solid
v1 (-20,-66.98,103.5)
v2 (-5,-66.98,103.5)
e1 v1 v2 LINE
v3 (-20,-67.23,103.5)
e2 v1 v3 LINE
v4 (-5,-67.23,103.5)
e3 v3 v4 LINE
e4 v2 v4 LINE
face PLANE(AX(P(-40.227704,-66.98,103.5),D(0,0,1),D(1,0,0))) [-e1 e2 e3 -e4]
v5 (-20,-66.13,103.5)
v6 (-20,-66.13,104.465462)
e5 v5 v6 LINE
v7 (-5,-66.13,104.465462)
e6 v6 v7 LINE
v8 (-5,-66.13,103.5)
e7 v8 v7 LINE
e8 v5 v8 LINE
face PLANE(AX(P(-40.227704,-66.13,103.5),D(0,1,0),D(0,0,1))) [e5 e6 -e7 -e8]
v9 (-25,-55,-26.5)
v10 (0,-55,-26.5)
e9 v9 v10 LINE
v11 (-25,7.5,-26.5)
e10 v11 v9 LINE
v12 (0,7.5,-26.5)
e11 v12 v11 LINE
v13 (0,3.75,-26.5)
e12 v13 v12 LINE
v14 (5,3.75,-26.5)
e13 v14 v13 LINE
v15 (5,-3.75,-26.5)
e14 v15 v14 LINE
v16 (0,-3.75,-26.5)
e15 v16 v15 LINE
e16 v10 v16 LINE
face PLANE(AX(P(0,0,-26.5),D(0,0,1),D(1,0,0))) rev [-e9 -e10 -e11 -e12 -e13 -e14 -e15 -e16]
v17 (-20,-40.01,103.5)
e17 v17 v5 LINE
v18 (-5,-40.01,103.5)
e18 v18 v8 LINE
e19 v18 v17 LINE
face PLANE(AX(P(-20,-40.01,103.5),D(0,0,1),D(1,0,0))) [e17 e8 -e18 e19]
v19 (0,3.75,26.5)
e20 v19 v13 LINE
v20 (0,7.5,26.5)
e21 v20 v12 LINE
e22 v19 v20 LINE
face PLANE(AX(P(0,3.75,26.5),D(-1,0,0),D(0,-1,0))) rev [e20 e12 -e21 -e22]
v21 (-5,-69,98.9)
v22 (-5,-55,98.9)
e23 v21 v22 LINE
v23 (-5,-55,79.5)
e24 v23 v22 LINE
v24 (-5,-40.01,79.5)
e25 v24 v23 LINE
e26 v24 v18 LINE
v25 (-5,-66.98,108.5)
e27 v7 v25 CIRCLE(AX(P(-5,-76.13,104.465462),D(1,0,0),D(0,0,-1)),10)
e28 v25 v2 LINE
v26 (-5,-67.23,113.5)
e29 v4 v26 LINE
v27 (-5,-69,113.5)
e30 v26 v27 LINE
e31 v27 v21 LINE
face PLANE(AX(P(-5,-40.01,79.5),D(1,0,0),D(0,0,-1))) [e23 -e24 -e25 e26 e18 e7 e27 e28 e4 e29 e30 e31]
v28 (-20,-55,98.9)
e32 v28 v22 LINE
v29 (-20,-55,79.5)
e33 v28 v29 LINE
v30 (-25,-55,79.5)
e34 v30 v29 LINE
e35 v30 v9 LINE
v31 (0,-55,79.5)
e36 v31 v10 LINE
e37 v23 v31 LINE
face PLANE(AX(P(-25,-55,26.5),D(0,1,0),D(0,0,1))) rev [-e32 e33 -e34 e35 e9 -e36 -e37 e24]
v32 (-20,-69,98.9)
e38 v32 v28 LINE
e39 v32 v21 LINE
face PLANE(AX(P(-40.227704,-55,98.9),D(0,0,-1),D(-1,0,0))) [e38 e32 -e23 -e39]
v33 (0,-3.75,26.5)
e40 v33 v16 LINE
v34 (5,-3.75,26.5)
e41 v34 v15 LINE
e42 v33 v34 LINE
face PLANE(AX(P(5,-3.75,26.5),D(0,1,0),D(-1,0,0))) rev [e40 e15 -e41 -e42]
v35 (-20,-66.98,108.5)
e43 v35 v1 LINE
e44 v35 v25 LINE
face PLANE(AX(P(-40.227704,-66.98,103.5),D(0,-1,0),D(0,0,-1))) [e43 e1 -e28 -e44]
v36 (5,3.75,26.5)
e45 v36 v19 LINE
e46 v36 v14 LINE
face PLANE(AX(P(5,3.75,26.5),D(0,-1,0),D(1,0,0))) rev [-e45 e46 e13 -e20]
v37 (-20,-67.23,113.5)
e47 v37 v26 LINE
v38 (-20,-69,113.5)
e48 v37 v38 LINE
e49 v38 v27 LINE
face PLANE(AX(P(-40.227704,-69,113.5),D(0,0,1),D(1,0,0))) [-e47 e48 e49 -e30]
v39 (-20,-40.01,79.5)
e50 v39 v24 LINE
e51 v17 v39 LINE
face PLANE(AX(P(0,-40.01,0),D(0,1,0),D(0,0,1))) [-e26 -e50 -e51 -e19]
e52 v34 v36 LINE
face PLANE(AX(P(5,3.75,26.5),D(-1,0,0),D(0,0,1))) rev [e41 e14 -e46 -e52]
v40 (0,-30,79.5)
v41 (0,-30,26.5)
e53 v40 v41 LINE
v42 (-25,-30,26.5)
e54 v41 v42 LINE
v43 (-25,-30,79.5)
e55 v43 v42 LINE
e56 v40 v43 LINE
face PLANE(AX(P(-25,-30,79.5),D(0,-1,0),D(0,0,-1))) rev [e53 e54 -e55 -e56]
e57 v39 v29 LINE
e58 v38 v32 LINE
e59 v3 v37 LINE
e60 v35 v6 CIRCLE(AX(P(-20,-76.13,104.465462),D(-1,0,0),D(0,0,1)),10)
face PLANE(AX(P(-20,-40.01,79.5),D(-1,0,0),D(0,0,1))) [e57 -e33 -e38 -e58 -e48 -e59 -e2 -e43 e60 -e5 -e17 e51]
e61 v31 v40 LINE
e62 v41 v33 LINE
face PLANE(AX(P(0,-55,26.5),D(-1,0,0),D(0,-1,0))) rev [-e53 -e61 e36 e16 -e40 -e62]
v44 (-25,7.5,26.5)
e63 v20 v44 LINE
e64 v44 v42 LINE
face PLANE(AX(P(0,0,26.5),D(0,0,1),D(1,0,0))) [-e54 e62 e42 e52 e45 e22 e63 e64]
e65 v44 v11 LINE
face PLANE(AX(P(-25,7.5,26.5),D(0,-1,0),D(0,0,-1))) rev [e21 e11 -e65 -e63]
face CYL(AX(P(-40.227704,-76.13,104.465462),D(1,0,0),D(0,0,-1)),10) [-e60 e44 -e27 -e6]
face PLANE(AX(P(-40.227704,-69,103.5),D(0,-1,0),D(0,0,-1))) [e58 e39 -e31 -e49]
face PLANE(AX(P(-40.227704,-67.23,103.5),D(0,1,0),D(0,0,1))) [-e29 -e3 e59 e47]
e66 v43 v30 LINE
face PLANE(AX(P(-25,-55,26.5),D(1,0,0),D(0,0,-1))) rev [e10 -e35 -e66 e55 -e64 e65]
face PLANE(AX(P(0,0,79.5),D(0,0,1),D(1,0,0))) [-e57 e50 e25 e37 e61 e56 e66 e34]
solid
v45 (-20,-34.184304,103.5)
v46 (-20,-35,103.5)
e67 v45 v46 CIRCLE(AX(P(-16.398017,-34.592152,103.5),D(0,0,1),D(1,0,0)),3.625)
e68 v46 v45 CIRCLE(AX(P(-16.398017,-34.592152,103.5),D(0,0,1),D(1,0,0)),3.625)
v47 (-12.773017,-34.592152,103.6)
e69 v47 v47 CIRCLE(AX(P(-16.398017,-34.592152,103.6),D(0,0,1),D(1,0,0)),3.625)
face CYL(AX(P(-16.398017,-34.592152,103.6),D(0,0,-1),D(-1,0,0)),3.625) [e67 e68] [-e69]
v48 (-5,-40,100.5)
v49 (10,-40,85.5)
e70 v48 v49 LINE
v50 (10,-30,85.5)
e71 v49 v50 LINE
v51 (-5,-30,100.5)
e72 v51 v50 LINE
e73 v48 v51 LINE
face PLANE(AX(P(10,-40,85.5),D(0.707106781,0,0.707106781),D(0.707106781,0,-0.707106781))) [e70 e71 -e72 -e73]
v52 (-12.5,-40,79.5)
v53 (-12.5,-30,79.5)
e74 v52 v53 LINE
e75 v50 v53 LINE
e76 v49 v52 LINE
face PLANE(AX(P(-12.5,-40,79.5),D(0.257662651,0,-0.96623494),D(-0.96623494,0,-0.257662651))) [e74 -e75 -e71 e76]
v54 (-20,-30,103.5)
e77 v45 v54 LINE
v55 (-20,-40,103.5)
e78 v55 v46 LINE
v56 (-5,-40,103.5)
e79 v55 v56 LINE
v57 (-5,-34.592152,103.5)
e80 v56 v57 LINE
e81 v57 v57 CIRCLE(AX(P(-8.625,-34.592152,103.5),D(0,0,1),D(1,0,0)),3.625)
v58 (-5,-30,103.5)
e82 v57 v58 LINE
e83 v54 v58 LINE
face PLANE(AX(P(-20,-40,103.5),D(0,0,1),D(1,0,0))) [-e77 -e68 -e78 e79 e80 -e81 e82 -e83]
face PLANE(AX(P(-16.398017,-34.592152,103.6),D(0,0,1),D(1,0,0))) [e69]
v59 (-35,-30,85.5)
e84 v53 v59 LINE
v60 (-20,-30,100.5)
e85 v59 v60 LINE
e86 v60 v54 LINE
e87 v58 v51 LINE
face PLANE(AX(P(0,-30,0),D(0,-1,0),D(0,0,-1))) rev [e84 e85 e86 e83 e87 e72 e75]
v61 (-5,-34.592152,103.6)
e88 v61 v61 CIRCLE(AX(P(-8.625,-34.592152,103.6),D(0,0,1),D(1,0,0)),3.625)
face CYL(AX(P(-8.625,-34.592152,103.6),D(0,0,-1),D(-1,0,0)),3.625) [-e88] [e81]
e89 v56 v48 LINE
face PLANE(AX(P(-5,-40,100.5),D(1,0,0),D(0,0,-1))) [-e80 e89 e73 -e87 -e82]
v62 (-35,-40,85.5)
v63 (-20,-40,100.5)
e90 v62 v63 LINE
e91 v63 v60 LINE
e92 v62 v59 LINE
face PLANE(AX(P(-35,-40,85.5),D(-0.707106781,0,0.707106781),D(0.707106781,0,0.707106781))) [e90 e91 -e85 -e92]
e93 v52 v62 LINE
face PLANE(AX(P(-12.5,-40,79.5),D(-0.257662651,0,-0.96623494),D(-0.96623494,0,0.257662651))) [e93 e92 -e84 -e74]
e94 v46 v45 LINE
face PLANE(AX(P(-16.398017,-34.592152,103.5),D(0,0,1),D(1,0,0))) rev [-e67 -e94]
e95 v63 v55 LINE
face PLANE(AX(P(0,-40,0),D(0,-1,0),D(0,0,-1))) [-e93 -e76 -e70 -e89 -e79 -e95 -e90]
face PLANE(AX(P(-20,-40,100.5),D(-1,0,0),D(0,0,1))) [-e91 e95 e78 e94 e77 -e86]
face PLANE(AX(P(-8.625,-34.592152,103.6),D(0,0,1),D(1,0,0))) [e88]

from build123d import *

# Parameters (mm, degrees)
BOSS_EXTRUDE1_DEPTH  = 26.5
SKETCH3_W            = 25
SKETCH3_H            = 25
BOSS_EXTRUDE2_DEPTH  = 53
BOSS_EXTRUDE3_DEPTH  = 10
SKETCH6_W            = 15
SKETCH6_H            = 24
BOSS_EXTRUDE9_DEPTH  = 14.99
BOSS_EXTRUDE10_DEPTH = 15
FILLET1_R            = 10
SKETCH9_R            = 3.625
BOSS_EXTRUDE11_DEPTH = 0.1


with BuildPart() as part:
    # Sketch2 → Boss-Extrude1 (new, symmetric)
    with BuildSketch(Plane.XY):
        Polygon((5, 3.75), (0, 3.75), (0, 7.5), (-25, 7.5), (-25, -55), (0, -55), (0, -3.75), (5, -3.75), align=None)
    extrude(amount=BOSS_EXTRUDE1_DEPTH, both=True)

    # Sketch3 → Boss-Extrude2 (add)
    with BuildSketch(Plane.XY.offset(26.5)):
        with Locations((-12.5, -42.5)):
            Rectangle(SKETCH3_W, SKETCH3_H)
    extrude(amount=BOSS_EXTRUDE2_DEPTH)

    # Sketch6 → Boss-Extrude9 (add)
    with BuildSketch(Plane.XZ.offset(55)):
        with Locations((-12.5, 91.5)):
            Rectangle(SKETCH6_W, SKETCH6_H)
    extrude(amount=-BOSS_EXTRUDE9_DEPTH)

    # Sketch8 → Boss-Extrude10 (add)
    with BuildSketch(Plane(origin=(-5, 0, 0), x_dir=(0, 0, -1), z_dir=(1, 0, 0))):
        Polygon((-103.5, -55), (-98.9, -55), (-98.9, -69), (-103.5, -69), (-113.5, -69), (-113.5, -67.23), (-103.5, -67.23), (-103.5, -66.98), (-108.5, -66.98), (-108.5, -66.13), (-103.5, -66.13), align=None)
    extrude(amount=-BOSS_EXTRUDE10_DEPTH)

    # Fillet1
    # the kernel refuses this fillet: 10 mm, written as the material it takes off along each edge
    with BuildSketch(Plane(origin=(5.086345969, -66.13, 108.5), x_dir=(0, 0, -1), z_dir=(-1, 0, 0))) as fillet1_piece_1:
        with BuildLine():
            CenterArc((4.034538387, 10), FILLET1_R, 246.205727049, 23.794272951)
            Line((0, 0.85), (0, 0))
            Line((0, 0), (4.034538387, 0))
        make_face()
    extrude(amount=35.172691937, mode=Mode.SUBTRACT)


with BuildPart() as body_2:
    # Sketch4 → Boss-Extrude3 (new body)
    with BuildSketch(Plane(origin=(0, -30, 0), x_dir=(1, 0, 0), z_dir=(0, 1, 0))):
        Polygon((-12.5, -79.5), (-35, -85.5), (-20, -100.5), (-20, -103.5), (-5, -103.5), (-5, -100.5), (10, -85.5), align=None)
    extrude(amount=-BOSS_EXTRUDE3_DEPTH)

    # Sketch9 → Boss-Extrude11 (add)
    with BuildSketch(Plane.XY.offset(103.5)):
        with Locations(Location((-16.398016516, -34.592152012, 0), (0, 0, 173.539985727))):
            Circle(SKETCH9_R)
        with Locations((-8.625, -34.592152012)):
            Circle(SKETCH9_R)
    extrude(amount=BOSS_EXTRUDE11_DEPTH)


solid = Compound([part.part, body_2.part])
